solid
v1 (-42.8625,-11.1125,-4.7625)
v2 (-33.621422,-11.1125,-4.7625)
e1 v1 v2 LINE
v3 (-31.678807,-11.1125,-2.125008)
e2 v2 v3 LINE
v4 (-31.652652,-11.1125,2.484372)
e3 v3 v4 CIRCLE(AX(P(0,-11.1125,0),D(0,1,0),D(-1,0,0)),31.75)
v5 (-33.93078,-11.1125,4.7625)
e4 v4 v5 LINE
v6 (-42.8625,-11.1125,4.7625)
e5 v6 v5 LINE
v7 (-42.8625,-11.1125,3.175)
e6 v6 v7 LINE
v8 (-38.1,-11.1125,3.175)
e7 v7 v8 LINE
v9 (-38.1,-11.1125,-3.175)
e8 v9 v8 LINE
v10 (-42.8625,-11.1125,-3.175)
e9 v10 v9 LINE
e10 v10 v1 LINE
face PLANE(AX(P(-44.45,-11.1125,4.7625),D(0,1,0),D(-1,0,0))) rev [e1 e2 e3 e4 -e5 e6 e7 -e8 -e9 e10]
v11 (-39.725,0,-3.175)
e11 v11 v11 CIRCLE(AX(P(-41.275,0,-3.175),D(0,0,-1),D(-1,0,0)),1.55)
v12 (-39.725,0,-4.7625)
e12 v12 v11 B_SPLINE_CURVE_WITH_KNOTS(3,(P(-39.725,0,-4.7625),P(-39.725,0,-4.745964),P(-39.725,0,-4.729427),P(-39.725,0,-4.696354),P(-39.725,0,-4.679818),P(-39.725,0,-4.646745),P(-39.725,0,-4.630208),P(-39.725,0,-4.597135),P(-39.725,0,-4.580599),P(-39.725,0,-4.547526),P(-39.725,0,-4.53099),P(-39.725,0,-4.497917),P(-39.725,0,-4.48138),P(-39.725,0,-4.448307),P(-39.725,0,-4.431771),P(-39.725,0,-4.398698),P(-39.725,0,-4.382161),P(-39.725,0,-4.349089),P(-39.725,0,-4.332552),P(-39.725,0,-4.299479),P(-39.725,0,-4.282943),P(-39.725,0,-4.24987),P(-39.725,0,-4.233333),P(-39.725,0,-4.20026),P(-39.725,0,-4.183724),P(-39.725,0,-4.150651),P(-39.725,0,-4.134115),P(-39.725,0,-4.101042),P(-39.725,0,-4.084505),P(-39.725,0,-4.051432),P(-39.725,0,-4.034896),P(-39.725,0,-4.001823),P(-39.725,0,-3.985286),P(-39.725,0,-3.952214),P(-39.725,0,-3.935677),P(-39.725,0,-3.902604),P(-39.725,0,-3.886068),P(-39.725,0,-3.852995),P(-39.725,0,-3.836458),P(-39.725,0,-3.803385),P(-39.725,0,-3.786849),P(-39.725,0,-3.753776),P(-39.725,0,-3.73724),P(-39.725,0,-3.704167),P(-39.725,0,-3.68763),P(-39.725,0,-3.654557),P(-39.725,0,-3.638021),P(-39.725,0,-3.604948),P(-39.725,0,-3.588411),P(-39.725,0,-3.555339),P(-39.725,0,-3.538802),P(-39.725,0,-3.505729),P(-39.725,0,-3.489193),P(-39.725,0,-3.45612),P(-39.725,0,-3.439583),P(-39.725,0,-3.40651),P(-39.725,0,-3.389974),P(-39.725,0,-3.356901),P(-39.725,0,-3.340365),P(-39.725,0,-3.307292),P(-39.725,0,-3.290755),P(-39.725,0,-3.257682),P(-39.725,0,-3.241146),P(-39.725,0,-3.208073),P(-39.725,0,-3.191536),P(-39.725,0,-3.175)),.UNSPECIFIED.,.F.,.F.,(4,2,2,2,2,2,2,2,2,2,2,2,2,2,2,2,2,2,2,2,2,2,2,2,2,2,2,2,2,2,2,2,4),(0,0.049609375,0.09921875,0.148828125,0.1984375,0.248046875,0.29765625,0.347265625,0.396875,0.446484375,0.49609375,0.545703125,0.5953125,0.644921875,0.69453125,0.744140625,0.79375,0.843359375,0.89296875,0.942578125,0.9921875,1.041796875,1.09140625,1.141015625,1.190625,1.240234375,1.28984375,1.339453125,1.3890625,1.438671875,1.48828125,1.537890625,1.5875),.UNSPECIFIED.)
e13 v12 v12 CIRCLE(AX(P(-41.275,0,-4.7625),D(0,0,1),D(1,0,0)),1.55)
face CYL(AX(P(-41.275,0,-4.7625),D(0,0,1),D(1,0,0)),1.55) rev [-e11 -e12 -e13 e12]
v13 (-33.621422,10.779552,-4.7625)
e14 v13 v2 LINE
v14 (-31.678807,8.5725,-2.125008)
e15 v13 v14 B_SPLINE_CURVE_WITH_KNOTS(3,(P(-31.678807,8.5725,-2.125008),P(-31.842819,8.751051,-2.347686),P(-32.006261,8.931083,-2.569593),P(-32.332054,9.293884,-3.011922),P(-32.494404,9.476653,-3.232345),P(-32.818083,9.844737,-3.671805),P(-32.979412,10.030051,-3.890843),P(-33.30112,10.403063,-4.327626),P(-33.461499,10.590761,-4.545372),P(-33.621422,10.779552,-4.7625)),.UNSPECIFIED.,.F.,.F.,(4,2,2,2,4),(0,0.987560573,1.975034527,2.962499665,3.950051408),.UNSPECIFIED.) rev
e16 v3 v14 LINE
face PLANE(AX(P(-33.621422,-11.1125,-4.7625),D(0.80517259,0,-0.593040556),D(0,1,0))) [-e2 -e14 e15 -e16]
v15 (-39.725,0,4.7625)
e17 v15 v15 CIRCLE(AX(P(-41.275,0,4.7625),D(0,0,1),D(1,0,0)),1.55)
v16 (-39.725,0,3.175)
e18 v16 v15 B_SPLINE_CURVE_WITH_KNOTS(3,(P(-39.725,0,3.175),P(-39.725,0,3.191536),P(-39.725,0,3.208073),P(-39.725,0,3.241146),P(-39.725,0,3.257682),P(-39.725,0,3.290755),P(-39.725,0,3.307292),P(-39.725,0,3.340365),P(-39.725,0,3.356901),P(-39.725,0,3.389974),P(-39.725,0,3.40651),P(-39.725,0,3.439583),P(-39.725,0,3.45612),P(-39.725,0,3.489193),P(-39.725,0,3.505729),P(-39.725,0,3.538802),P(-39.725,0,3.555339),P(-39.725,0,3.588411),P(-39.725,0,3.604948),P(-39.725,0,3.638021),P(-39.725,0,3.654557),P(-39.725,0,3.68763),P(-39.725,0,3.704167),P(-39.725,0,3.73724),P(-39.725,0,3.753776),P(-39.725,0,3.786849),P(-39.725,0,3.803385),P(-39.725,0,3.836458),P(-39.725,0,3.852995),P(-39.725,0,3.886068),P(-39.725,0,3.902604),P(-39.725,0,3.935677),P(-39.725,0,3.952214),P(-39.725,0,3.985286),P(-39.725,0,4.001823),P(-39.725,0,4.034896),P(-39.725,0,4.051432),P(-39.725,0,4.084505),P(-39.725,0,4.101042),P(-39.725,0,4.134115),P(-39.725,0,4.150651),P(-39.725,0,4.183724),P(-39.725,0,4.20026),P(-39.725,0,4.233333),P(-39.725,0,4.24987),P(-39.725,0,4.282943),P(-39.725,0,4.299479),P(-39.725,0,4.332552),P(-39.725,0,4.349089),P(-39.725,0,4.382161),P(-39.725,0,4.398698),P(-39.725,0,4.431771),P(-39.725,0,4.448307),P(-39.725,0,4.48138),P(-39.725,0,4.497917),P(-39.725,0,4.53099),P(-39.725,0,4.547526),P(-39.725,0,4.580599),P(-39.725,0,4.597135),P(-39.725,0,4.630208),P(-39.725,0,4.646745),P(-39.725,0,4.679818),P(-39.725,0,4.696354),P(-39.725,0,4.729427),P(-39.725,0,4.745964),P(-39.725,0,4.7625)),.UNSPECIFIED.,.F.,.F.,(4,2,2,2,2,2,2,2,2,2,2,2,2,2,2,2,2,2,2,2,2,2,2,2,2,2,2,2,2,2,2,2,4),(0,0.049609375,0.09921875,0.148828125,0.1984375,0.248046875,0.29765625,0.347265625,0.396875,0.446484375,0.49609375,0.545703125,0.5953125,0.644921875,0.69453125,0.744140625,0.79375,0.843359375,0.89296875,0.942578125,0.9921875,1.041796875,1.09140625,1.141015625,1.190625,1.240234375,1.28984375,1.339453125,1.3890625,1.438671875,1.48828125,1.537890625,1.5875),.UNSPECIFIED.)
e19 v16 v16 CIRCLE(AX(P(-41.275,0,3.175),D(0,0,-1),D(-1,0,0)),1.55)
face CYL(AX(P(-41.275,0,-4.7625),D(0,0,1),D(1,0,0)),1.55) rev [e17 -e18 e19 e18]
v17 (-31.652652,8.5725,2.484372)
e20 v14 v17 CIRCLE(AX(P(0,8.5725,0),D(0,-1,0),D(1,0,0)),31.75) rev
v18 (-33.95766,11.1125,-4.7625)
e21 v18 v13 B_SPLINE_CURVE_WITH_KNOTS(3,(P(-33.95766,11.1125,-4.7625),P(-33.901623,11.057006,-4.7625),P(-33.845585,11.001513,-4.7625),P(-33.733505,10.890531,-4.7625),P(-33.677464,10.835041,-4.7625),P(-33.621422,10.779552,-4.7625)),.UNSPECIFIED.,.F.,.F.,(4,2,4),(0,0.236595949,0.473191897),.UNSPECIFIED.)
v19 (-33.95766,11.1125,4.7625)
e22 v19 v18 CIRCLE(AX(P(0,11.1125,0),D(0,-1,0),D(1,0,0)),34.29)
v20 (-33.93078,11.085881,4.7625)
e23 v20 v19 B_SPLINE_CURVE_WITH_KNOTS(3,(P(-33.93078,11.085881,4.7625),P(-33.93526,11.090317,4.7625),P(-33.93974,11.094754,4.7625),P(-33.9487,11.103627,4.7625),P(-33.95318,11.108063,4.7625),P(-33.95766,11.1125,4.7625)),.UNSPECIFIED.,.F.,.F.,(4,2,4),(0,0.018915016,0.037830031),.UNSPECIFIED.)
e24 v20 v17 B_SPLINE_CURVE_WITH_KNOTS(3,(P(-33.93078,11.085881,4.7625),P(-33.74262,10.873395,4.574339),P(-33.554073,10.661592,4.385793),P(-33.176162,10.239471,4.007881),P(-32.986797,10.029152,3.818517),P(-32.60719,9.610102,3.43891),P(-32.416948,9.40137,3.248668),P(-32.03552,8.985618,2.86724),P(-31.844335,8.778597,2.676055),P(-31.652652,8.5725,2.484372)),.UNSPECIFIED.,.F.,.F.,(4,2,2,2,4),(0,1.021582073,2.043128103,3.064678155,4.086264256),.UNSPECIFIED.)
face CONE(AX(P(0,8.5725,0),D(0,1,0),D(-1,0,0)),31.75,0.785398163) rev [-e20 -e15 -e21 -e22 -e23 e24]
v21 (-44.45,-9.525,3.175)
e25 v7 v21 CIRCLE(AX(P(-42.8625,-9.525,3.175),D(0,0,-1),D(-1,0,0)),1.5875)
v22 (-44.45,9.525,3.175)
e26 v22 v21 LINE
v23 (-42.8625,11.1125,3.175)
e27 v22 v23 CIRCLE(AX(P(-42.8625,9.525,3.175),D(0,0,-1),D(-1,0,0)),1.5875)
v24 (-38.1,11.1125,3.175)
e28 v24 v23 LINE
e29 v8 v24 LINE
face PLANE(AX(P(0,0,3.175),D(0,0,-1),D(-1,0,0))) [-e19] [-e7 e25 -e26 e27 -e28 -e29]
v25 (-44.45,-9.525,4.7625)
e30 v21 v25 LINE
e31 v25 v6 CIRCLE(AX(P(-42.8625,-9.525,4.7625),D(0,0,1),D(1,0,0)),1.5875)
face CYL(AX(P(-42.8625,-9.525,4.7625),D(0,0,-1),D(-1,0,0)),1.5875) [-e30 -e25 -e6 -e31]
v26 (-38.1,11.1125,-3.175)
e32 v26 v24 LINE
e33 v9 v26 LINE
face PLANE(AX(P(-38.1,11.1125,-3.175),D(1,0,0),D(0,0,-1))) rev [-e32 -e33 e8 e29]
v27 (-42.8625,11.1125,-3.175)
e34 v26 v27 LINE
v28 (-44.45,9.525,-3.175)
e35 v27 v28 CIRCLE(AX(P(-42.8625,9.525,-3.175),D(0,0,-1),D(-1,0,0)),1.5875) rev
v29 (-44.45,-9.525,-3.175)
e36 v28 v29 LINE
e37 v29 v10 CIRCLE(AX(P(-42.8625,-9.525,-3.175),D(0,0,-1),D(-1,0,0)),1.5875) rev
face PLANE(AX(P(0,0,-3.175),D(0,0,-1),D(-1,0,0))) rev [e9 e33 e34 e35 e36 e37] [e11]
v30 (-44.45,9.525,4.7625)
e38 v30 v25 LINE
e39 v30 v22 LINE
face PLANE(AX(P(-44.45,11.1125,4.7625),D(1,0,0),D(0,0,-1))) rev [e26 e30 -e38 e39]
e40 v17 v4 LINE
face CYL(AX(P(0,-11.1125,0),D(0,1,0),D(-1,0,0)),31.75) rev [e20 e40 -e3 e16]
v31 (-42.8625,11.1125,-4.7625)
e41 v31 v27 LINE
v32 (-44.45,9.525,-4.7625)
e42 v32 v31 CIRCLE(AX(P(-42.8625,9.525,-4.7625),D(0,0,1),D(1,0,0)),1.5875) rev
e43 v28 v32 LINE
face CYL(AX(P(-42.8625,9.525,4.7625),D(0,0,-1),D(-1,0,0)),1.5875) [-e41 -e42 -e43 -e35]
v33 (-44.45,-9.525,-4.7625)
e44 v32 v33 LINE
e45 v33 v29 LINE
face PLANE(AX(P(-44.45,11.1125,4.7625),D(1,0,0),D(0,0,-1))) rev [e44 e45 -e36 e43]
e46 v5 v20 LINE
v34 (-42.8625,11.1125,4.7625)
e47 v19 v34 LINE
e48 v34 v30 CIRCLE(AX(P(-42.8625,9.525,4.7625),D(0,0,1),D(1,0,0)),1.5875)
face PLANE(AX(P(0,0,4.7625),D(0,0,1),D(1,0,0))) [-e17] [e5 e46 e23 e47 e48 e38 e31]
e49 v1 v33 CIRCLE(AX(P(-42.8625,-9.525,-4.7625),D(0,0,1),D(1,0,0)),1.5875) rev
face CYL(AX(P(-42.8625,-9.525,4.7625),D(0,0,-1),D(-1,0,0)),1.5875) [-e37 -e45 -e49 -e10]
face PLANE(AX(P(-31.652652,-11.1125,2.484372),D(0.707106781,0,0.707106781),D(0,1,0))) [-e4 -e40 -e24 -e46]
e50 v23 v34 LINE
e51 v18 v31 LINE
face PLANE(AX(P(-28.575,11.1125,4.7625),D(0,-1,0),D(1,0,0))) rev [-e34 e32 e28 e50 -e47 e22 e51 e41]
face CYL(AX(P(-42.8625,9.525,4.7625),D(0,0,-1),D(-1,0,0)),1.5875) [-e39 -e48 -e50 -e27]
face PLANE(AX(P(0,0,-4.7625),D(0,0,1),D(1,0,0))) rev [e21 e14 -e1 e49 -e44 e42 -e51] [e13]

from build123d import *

# Parameters (mm, degrees)
SKETCH1_W           = 15.875
SKETCH1_H           = 22.225
BOSS_EXTRUDE1_DEPTH = 4.7625
SKETCH2_W           = 6.35
SKETCH2_H           = 22.225
CUT_EXTRUDE1_DEPTH  = 3.175
SKETCH3_R           = 31.75
CUT_EXTRUDE2_DEPTH  = 50.924287989
CHAMFER1_SIZE       = 2.23064129
CHAMFER1_SIZE_2     = 2.54
SKETCH4_R           = 1.55
CUT_EXTRUDE3_DEPTH  = 47.797604439
FILLET1_R           = 1.5875


with BuildPart() as part:
    # Sketch1 → Boss-Extrude1 (new, symmetric)
    with BuildSketch(Plane.XY):
        with Locations((-36.5125, 0)):
            Rectangle(SKETCH1_W, SKETCH1_H)
    extrude(amount=BOSS_EXTRUDE1_DEPTH, both=True)

    # Sketch2 → Cut-Extrude1 (cut, symmetric)
    with BuildSketch(Plane.XY):
        with Locations((-41.275, 0)):
            Rectangle(SKETCH2_W, SKETCH2_H)
    extrude(amount=CUT_EXTRUDE1_DEPTH, both=True, mode=Mode.SUBTRACT)

    # Sketch3 → Cut-Extrude2 (cut, through all)
    with BuildSketch(Plane(origin=(0, 11.1125, 0), x_dir=(1, 0, 0), z_dir=(0, 1, 0))):
        Circle(SKETCH3_R)
    extrude(amount=-CUT_EXTRUDE2_DEPTH, mode=Mode.SUBTRACT)

    # Chamfer1
    # the kernel refuses this chamfer: 2.54, 2.23064129 mm, written as the material it takes off along each edge
    with BuildSketch(Plane(origin=(-31.390780394, -17.93455078, -4.7625), x_dir=(-1, 0, 0), z_dir=(0, 1, 0))) as chamfer1_piece_1:
        with BuildLine():
            Line((CHAMFER1_SIZE, 0), (0.288027051, 2.637492029))
            ThreePointArc((0.288027051, 2.637492029), (0.17562072, 1.352980867), (0, 0))
            Line((0, 0), (CHAMFER1_SIZE, 0))
        make_face()
    extrude(amount=35.86910156, mode=Mode.SUBTRACT)
    with BuildSketch(Plane(origin=(-31.390780394, -17.644574789, 4.7625), x_dir=(-1, 0, 0), z_dir=(0, 1, 0))) as chamfer1_piece_2:
        with BuildLine():
            Line((CHAMFER1_SIZE_2, 0), (0.261871886, -2.278128114))
            ThreePointArc((0.261871886, -2.278128114), (0.155107804, -1.168138054), (0, 0))
            Line((0, 0), (CHAMFER1_SIZE_2, 0))
        make_face()
    extrude(amount=35.289149579, mode=Mode.SUBTRACT)
    with BuildSketch(Plane(origin=(0, 11.1125, 0), x_dir=(-0.9371917542835735, 0, -0.34881458642504903), z_dir=(0.34881458642504903, 0, -0.9371917542835735))) as chamfer1_piece_3:
        Polygon((31.75 + CHAMFER1_SIZE_2, 0), (31.75, -CHAMFER1_SIZE_2), (31.75, 0), align=None)
    revolve(axis=Axis((0, 11.1125, 0), (0, 1, 0)), revolution_arc=40.829654119, mode=Mode.SUBTRACT)

    # Sketch4 → Cut-Extrude3 (cut, through all)
    with BuildSketch(Plane.XY.offset(4.7625)):
        with Locations((-41.275, 0)):
            Circle(SKETCH4_R)
    extrude(amount=-CUT_EXTRUDE3_DEPTH, mode=Mode.SUBTRACT)

    # Fillet1
    fillet1_edges = [part.edges().sort_by_distance(p)[0] for p in [
        (-44.45, -11.1125, -3.96875),
        (-44.45, 11.1125, -3.96875),
        (-44.45, -11.1125, 3.96875),
        (-44.45, 11.1125, 3.96875),
    ]]
    fillet(fillet1_edges, radius=FILLET1_R)


solid = part.part
